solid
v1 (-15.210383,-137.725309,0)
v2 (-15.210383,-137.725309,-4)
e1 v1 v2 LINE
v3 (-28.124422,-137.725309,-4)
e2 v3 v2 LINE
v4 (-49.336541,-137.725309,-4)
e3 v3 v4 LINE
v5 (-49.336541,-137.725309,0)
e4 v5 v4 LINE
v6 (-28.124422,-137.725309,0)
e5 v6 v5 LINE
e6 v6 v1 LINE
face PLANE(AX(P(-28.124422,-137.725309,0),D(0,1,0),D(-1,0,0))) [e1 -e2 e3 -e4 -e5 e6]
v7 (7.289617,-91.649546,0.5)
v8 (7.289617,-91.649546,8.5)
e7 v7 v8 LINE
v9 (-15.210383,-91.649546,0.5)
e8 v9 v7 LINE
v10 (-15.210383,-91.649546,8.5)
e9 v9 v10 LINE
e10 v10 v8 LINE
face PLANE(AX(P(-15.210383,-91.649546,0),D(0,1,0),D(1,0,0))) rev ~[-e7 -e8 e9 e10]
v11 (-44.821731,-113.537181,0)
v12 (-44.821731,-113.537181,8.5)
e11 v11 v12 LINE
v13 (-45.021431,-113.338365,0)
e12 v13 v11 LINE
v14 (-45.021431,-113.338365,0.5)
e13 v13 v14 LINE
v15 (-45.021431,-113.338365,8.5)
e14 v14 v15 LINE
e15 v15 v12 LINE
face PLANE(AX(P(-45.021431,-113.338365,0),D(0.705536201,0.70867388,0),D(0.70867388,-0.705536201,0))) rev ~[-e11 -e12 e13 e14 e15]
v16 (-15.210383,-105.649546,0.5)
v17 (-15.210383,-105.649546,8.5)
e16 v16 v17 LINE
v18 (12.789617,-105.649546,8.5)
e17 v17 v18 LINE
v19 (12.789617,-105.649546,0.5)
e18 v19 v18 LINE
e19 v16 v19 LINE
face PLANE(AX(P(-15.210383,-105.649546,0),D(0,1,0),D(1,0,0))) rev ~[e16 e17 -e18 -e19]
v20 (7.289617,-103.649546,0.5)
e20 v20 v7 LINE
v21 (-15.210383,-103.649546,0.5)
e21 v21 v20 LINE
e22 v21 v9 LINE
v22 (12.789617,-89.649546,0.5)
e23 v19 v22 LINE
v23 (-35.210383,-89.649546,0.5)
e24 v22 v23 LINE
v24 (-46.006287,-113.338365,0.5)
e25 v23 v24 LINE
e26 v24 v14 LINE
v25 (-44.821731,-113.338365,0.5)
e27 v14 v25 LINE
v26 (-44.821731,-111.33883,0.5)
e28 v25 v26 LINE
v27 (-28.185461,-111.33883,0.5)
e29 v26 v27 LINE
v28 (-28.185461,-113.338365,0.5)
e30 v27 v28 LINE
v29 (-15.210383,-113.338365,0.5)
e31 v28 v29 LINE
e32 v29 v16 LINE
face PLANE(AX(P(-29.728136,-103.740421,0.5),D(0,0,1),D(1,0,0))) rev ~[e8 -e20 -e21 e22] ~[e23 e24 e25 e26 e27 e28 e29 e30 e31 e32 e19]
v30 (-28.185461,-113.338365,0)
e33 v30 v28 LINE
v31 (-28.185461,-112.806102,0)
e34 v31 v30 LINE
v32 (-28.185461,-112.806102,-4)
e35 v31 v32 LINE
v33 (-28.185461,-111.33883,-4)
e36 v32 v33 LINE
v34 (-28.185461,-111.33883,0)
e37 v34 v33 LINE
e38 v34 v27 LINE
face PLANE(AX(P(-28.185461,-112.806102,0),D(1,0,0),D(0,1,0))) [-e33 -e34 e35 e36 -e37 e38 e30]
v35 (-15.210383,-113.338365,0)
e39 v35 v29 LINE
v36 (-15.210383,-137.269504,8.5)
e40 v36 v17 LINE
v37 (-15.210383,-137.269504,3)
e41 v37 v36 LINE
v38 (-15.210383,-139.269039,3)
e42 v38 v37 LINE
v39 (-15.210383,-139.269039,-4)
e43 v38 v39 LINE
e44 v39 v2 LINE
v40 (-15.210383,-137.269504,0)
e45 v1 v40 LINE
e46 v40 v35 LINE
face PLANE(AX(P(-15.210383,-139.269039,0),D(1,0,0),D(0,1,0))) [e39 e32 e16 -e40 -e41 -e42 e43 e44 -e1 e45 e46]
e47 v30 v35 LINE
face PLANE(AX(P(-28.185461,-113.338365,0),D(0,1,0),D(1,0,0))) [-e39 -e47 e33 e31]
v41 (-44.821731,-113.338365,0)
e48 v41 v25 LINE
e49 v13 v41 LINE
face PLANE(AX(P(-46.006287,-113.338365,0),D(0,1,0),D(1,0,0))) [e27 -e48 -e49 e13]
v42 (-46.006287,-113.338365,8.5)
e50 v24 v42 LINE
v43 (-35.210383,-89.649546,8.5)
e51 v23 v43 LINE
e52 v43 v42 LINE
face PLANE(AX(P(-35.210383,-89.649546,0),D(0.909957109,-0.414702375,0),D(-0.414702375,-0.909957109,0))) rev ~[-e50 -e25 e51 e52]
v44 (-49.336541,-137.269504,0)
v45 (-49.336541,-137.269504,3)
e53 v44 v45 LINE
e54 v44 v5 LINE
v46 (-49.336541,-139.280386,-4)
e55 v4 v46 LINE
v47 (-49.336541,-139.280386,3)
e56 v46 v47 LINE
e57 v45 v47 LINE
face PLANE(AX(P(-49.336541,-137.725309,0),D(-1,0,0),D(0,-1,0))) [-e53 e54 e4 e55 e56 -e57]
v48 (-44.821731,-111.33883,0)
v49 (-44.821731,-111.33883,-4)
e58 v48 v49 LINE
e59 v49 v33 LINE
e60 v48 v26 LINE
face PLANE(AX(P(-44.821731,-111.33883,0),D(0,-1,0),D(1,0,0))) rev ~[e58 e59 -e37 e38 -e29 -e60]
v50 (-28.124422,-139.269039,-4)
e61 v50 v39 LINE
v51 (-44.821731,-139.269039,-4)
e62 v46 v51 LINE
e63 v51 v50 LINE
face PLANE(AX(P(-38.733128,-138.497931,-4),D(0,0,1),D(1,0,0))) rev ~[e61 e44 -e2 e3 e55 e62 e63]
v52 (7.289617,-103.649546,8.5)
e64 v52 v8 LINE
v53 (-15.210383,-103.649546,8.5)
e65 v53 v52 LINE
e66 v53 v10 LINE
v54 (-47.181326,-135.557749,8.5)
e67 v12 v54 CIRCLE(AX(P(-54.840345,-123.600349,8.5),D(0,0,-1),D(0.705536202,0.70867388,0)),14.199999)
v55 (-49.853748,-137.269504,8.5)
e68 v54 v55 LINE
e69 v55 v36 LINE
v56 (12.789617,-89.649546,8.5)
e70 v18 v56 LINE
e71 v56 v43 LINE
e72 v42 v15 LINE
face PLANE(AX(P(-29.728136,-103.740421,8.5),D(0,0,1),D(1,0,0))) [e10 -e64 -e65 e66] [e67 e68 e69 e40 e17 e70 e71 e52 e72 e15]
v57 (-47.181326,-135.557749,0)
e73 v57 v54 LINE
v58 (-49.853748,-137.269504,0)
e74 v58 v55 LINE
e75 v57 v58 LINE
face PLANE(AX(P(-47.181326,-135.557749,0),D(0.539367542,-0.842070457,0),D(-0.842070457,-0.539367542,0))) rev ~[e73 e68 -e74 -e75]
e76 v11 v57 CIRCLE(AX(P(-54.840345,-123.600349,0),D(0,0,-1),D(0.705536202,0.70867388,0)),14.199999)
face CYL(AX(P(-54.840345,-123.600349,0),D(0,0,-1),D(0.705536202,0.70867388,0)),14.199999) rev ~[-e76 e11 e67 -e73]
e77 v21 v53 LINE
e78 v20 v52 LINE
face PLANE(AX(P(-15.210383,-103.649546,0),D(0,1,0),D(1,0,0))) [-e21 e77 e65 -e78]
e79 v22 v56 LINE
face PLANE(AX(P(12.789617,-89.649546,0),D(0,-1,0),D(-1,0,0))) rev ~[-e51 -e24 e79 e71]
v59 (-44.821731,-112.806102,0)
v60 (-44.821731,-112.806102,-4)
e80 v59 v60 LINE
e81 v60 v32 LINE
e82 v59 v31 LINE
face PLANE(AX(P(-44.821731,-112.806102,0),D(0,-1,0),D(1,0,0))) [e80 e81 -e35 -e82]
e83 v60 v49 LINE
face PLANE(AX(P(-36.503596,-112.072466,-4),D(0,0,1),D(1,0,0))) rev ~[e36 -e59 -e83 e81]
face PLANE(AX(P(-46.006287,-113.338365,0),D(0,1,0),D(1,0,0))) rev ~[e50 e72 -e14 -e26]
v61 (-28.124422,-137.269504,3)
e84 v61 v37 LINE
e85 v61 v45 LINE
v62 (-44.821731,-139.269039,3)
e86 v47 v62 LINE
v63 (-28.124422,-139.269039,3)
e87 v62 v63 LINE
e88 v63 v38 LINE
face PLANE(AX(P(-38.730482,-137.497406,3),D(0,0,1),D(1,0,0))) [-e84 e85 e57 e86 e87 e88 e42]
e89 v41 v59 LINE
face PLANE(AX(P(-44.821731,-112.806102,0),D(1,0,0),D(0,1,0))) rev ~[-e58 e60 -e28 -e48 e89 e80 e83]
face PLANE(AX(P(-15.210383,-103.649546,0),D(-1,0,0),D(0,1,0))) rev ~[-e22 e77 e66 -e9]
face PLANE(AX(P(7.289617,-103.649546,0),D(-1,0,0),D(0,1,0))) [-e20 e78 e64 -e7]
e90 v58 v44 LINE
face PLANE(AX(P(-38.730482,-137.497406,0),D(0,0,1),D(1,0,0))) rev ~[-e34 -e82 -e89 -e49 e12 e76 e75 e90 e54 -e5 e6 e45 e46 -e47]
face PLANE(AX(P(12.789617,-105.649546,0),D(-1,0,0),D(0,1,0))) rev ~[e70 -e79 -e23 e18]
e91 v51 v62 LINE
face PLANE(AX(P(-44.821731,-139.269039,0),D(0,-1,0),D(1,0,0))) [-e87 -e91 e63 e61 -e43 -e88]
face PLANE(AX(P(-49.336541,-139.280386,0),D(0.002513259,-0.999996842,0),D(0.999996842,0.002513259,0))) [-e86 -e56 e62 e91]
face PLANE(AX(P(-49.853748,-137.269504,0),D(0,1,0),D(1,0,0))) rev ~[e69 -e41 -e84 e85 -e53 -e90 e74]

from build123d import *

# Parameters (mm, degrees)
F0_W     = 22.5
F0_H     = 12
F0_W_2   = 16.6362704164
F0_H_2   = 1.4672726393
F1_DEPTH = 8.5
F0_W_3   = 12.9140389063
F0_H_3   = 0.4558046321
F0_H_4   = 1.5437308085
F2_DEPTH = 3
F3_DEPTH = 4
F4_DEPTH = 0.5
F5_DEPTH = 0.5
F6_DEPTH = 4


# Not quite as in the source:
# - a feature names something its author has since deleted; it is built from what else it names


with BuildPart() as f1:
    # F0 (on Top) → F1 (new body)
    with BuildSketch(Plane.XY):
        Polygon((-28.1854607165, -113.3383650622), (-15.2103829287, -113.3383650622), (-15.2103829287, -112.8061022609), (-15.2103829287, -111.3388296217), (-15.2103829287, -105.6495462671), (-21.261529997, -105.6495462671), (-21.261529997, -89.6495462671), (-35.2103829287, -89.6495462671), (-46.0062867338, -113.3383650622), (-45.0214308559, -113.3383650622), (-44.8217311329, -113.3383650622), (-44.8217311329, -112.8061022609), (-44.8217311329, -111.3388296217), (-28.1854607165, -111.3388296217), (-28.1854607165, -112.8061022609), align=None)
        Polygon((-28.1244218349, -137.2695039054), (-15.2103829287, -137.2695039054), (-15.2103829287, -136.6045172354), (-15.2103829287, -114.0332519535), (-15.2103829287, -113.3383650622), (-28.1854607165, -113.3383650622), (-35.2103829287, -113.3383650622), (-35.2103829287, -125.3039344838), (-35.2103829287, -137.2695039054), align=None)
        with BuildLine():
            Line((-49.3365414441, -137.2695039054), (-35.2103829287, -137.2695039054))
            Line((-35.2103829287, -137.2695039054), (-35.2103829287, -125.3039344838))
            Line((-35.2103829287, -125.3039344838), (-35.2103829287, -113.3383650622))
            Line((-35.2103829287, -113.3383650622), (-44.8217311329, -113.3383650622))
            Line((-44.8217311329, -113.3383650622), (-44.8217311329, -113.5371806076))
            ThreePointArc((-44.8217311329, -113.5371806076), (-40.72117222, -125.1132769851), (-47.1813260123, -135.5577493852))
            Line((-47.1813260123, -135.5577493852), (-49.8537484313, -137.2695039054))
            Line((-49.8537484313, -137.2695039054), (-49.3365414441, -137.2695039054))
        make_face()
        Polygon((-21.261529997, -105.6495462671), (-15.2103829287, -105.6495462671), (7.2896170713, -105.6495462671), (12.7896170713, -105.6495462671), (12.7896170713, -91.6495462671), (12.7896170713, -89.6495462671), (-15.2103829287, -89.6495462671), (-21.261529997, -89.6495462671), align=None)
        with Locations((-3.9603829287, -97.6495462671)):
            Rectangle(F0_W, F0_H, mode=Mode.SUBTRACT)
        Polygon((-35.2103829287, -113.3383650622), (-28.1854607165, -113.3383650622), (-28.1854607165, -112.8061022609), (-44.8217311329, -112.8061022609), (-44.8217311329, -113.3383650622), align=None)
        with Locations((-36.5035959247, -112.0724659413)):
            Rectangle(F0_W_2, F0_H_2)
        Polygon((-44.8217311329, -113.5371806076), (-44.8217311329, -113.3383650622), (-45.0214308559, -113.3383650622), align=None)
    extrude(amount=F1_DEPTH)

    # F0 (on Top) → F2 (join)
    with BuildSketch(Plane.XY):
        Polygon((-28.1244218349, -137.7253085375), (-28.1244218349, -137.2695039054), (-35.2103829287, -137.2695039054), (-49.3365414441, -137.2695039054), (-49.3365414441, -137.7253085375), align=None)
        Polygon((-28.1244218349, -139.269039346), (-28.1244218349, -137.7253085375), (-49.3365414441, -137.7253085375), (-49.3365414441, -139.2803862691), (-44.8217311329, -139.269039346), align=None)
        with Locations((-21.6674023818, -137.4974062214)):
            Rectangle(F0_W_3, F0_H_3)
        with Locations((-21.6674023818, -138.4971739417)):
            Rectangle(F0_W_3, F0_H_4)
    extrude(amount=F2_DEPTH)

    # F0 (on Top) → F3 (join)
    with BuildSketch(Plane.XY):
        Polygon((-28.1244218349, -139.269039346), (-28.1244218349, -137.7253085375), (-49.3365414441, -137.7253085375), (-49.3365414441, -139.2803862691), (-44.8217311329, -139.269039346), align=None)
        with Locations((-21.6674023818, -138.4971739417)):
            Rectangle(F0_W_3, F0_H_4)
    extrude(amount=-F3_DEPTH)

    # F0 (on Top) → F4 (cut)
    with BuildSketch(Plane.XY):
        Polygon((-28.1854607165, -113.3383650622), (-15.2103829287, -113.3383650622), (-15.2103829287, -112.8061022609), (-15.2103829287, -111.3388296217), (-15.2103829287, -105.6495462671), (-21.261529997, -105.6495462671), (-21.261529997, -89.6495462671), (-35.2103829287, -89.6495462671), (-46.0062867338, -113.3383650622), (-45.0214308559, -113.3383650622), (-44.8217311329, -113.3383650622), (-44.8217311329, -112.8061022609), (-44.8217311329, -111.3388296217), (-28.1854607165, -111.3388296217), (-28.1854607165, -112.8061022609), align=None)
        Polygon((-21.261529997, -105.6495462671), (-15.2103829287, -105.6495462671), (7.2896170713, -105.6495462671), (12.7896170713, -105.6495462671), (12.7896170713, -91.6495462671), (12.7896170713, -89.6495462671), (-15.2103829287, -89.6495462671), (-21.261529997, -89.6495462671), align=None)
        with Locations((-3.9603829287, -97.6495462671)):
            Rectangle(F0_W, F0_H, mode=Mode.SUBTRACT)
    extrude(amount=F4_DEPTH, mode=Mode.SUBTRACT)

    # F0 (on Top) → F5 (join)
    with BuildSketch(Plane.XY):
        with Locations((-36.5035959247, -112.0724659413)):
            Rectangle(F0_W_2, F0_H_2)
        Polygon((-35.2103829287, -113.3383650622), (-28.1854607165, -113.3383650622), (-28.1854607165, -112.8061022609), (-44.8217311329, -112.8061022609), (-44.8217311329, -113.3383650622), align=None)
    extrude(amount=F5_DEPTH)

    # F0 (on Top) → F6 (join)
    with BuildSketch(Plane.XY):
        with Locations((-36.5035959247, -112.0724659413)):
            Rectangle(F0_W_2, F0_H_2)
    extrude(amount=-F6_DEPTH)


solid = f1.part
